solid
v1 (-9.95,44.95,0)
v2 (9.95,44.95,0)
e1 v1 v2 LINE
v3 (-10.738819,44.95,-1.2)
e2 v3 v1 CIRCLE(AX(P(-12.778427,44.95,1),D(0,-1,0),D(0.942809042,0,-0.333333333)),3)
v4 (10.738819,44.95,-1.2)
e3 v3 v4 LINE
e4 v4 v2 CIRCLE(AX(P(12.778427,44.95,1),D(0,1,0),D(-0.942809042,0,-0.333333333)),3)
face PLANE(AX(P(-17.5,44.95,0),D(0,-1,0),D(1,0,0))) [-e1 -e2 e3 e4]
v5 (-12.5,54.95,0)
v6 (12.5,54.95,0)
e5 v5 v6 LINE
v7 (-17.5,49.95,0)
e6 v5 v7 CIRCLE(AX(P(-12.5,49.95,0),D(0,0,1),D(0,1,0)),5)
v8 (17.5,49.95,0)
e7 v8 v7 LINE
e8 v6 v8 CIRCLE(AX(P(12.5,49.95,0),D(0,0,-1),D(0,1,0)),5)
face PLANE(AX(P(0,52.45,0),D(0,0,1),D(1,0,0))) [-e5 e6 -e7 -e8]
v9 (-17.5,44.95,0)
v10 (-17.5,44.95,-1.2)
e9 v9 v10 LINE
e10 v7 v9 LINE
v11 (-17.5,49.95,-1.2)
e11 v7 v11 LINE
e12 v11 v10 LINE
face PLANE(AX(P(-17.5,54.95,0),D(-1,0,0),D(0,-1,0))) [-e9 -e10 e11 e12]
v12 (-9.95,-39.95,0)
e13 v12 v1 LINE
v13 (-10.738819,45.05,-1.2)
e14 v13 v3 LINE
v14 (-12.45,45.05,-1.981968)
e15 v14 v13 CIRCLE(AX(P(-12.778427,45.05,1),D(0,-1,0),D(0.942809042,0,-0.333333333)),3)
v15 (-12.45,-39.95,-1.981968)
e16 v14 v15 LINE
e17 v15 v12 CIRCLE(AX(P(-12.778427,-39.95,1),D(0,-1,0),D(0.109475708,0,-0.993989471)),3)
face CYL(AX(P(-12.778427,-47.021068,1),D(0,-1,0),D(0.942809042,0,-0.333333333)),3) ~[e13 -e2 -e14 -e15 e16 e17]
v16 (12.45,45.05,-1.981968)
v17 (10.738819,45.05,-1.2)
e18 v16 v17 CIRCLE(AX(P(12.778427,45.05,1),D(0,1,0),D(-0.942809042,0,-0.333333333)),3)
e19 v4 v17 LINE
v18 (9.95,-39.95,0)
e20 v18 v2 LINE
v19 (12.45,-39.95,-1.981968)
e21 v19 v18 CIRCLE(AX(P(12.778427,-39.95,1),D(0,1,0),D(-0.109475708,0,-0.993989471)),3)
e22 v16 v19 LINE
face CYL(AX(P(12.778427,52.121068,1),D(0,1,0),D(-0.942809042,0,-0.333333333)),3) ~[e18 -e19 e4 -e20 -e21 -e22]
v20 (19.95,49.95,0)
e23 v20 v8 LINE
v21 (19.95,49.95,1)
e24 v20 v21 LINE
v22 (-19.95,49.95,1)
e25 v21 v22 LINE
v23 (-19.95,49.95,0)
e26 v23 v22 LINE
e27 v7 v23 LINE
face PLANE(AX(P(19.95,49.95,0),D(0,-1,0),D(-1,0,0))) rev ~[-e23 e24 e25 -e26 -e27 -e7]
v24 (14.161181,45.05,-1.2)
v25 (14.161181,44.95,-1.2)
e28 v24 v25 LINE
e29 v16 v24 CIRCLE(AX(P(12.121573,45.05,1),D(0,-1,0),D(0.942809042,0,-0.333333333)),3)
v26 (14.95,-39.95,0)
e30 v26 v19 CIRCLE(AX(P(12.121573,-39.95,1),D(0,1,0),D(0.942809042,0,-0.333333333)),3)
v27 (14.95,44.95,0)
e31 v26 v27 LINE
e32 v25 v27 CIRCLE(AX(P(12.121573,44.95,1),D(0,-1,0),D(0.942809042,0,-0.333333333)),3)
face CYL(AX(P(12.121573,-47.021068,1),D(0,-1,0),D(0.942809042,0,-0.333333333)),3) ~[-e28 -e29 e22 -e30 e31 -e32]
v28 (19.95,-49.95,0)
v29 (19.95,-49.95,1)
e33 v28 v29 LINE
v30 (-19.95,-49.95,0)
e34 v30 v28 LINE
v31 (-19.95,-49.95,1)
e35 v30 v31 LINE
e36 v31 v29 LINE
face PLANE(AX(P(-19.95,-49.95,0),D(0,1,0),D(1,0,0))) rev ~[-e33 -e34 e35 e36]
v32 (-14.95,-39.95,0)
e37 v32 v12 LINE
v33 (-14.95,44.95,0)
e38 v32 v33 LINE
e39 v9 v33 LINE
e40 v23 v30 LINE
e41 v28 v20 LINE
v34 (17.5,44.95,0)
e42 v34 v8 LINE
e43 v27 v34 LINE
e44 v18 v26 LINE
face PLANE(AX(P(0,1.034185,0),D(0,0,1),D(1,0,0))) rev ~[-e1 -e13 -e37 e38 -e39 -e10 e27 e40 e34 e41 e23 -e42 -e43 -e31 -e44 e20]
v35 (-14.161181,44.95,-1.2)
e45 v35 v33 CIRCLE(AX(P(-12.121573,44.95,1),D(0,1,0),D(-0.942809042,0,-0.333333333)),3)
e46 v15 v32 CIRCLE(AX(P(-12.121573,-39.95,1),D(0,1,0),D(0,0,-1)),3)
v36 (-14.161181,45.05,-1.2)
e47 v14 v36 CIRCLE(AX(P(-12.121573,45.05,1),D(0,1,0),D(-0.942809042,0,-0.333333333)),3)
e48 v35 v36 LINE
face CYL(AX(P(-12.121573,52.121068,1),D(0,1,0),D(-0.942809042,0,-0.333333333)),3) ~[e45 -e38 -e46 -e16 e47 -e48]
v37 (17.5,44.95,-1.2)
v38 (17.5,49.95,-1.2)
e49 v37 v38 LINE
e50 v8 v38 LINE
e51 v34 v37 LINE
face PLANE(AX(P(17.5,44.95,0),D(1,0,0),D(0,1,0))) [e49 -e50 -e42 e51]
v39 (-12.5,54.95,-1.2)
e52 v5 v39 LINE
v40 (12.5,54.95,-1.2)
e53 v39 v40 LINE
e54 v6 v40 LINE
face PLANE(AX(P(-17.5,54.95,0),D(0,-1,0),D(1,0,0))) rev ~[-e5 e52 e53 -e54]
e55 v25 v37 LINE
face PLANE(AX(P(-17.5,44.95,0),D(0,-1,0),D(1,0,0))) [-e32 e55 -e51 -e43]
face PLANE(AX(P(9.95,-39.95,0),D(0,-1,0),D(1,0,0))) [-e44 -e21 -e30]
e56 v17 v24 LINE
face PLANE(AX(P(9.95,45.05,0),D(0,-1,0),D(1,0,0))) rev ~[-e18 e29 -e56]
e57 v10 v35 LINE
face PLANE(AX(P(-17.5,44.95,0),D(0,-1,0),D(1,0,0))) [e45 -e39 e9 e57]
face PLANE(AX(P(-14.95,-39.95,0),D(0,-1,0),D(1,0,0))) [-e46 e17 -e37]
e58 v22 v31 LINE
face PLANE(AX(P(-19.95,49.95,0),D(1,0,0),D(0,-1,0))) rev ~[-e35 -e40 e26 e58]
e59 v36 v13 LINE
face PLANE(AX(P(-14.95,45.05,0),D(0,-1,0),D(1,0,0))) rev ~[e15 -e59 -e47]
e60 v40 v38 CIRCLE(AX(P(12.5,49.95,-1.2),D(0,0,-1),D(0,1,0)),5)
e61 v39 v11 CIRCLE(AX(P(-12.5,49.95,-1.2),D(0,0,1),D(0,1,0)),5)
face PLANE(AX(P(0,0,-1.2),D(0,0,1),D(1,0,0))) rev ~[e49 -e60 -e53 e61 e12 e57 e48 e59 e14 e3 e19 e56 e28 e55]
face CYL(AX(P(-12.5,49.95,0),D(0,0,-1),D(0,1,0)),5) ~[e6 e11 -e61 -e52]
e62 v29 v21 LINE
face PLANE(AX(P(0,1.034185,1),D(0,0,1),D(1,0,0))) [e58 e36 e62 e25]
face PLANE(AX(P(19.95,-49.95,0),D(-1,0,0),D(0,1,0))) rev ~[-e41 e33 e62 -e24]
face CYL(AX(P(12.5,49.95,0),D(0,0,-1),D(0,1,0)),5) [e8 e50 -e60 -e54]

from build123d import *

# Parameters (mm, degrees)
F0_W         = 35
F0_H         = 5
F1_DEPTH     = 1
F2_DEPTH     = 1.2
F3_W         = 5
F3_H         = 85
F4_DEPTH     = 2
F5_T4_DEPTH  = 99.1421356237
F5_T9_DEPTH  = 99.1421356237
F5_T14_DEPTH = 99.1421356237
F5_T19_DEPTH = 99.1421356237
F5_T24_DEPTH = 99.1421356237
F5_T29_DEPTH = 99.1421356237
F5_T34_DEPTH = 99.1421356237
F5_T39_DEPTH = 99.1421356237
F6_R         = 5


# Not quite as in the source:
# - a fillet or chamfer that OpenCascade refuses, or shapes differently, is made with other operations: its cross-section is extruded or revolved along the edge and cut away or added


with BuildPart() as f1:
    # F0 (on Top) → F1 (new body)
    with BuildSketch(Plane.XY):
        Polygon((-19.95, -49.95), (19.95, -49.95), (19.95, 49.95), (17.5, 49.95), (17.5, 44.95), (-17.5, 44.95), (-17.5, 49.95), (-19.95, 49.95), align=None)
        with Locations((0, 47.45)):
            Rectangle(F0_W, F0_H)
    extrude(amount=F1_DEPTH)

    # F0 (on Top) → F2 (join)
    with BuildSketch(Plane.XY):
        with Locations((0, 52.45)):
            Rectangle(F0_W, F0_H)
        with Locations((0, 47.45)):
            Rectangle(F0_W, F0_H)
    extrude(amount=-F2_DEPTH)

    # F3 (on face) → F4 (join)
    with BuildSketch(Plane.XY):
        with Locations((-12.45, 2.55)):
            Rectangle(F3_W, F3_H)
        with Locations((12.45, 2.55)):
            Rectangle(F3_W, F3_H)
    extrude(amount=-F4_DEPTH)

    # F5: fillet of radius 3 on 4 edges, made by hand


with BuildPart() as f5_tool2:
    # F5_s3 → F5_t4 (new body)
    with BuildSketch(Plane.XZ.offset(-52.1210678119)):
        with BuildLine():
            ThreePointArc((-14.95, 0), (-13.8536236828, -1.4494897428), (-12.1215728753, -2))
            Line((-12.1215728753, -2), (-14.95, -2))
            Line((-14.95, -2), (-14.95, 0))
        make_face()
    extrude(amount=F5_T4_DEPTH)

    split(bisect_by=Plane.XY.offset(-1.2), keep=Keep.BOTTOM)


with BuildPart() as f1_1:
    add(f1.part)

    # F5_t1: cut F5_tool2
    add(f5_tool2.part, mode=Mode.SUBTRACT)


with BuildPart() as f5_tool7:
    # F5_s8 → F5_t9 (new body)
    with BuildSketch(Plane.XZ.offset(-52.1210678119)):
        with BuildLine():
            ThreePointArc((-14.95, 0), (-13.8536236828, -1.4494897428), (-12.1215728753, -2))
            Line((-12.1215728753, -2), (-14.95, -2))
            Line((-14.95, -2), (-14.95, 0))
        make_face()
    extrude(amount=F5_T9_DEPTH)

    split(bisect_by=Plane.XZ.offset(-44.95), keep=Keep.TOP)


with BuildPart() as f1_2:
    add(f1_1.part)

    # F5_t6: cut F5_tool7
    add(f5_tool7.part, mode=Mode.SUBTRACT)


with BuildPart() as f5_tool12:
    # F5_s13 → F5_t14 (new body)
    with BuildSketch(Plane.XZ.offset(47.0210678119)):
        with BuildLine():
            ThreePointArc((-9.95, 0), (-11.0463763172, -1.4494897428), (-12.7784271247, -2))
            Line((-12.7784271247, -2), (-9.95, -2))
            Line((-9.95, -2), (-9.95, 0))
        make_face()
    extrude(amount=-F5_T14_DEPTH)

    split(bisect_by=Plane.XZ.offset(-44.95), keep=Keep.TOP)


with BuildPart() as f1_3:
    add(f1_2.part)

    # F5_t11: cut F5_tool12
    add(f5_tool12.part, mode=Mode.SUBTRACT)


with BuildPart() as f5_tool17:
    # F5_s18 → F5_t19 (new body)
    with BuildSketch(Plane.XZ.offset(47.0210678119)):
        with BuildLine():
            ThreePointArc((-9.95, 0), (-11.0463763172, -1.4494897428), (-12.7784271247, -2))
            Line((-12.7784271247, -2), (-9.95, -2))
            Line((-9.95, -2), (-9.95, 0))
        make_face()
    extrude(amount=-F5_T19_DEPTH)

    split(bisect_by=Plane.XY.offset(-1.2), keep=Keep.BOTTOM)


with BuildPart() as f1_4:
    add(f1_3.part)

    # F5_t16: cut F5_tool17
    add(f5_tool17.part, mode=Mode.SUBTRACT)


with BuildPart() as f5_tool22:
    # F5_s23 → F5_t24 (new body)
    with BuildSketch(Plane.XZ.offset(47.0210678119)):
        with BuildLine():
            ThreePointArc((14.95, 0), (13.8536236828, -1.4494897428), (12.1215728753, -2))
            Line((12.1215728753, -2), (14.95, -2))
            Line((14.95, -2), (14.95, 0))
        make_face()
    extrude(amount=-F5_T24_DEPTH)

    split(bisect_by=Plane.XZ.offset(-44.95), keep=Keep.TOP)


with BuildPart() as f1_5:
    add(f1_4.part)

    # F5_t21: cut F5_tool22
    add(f5_tool22.part, mode=Mode.SUBTRACT)


with BuildPart() as f5_tool27:
    # F5_s28 → F5_t29 (new body)
    with BuildSketch(Plane.XZ.offset(47.0210678119)):
        with BuildLine():
            ThreePointArc((14.95, 0), (13.8536236828, -1.4494897428), (12.1215728753, -2))
            Line((12.1215728753, -2), (14.95, -2))
            Line((14.95, -2), (14.95, 0))
        make_face()
    extrude(amount=-F5_T29_DEPTH)

    split(bisect_by=Plane.XY.offset(-1.2), keep=Keep.BOTTOM)


with BuildPart() as f1_6:
    add(f1_5.part)

    # F5_t26: cut F5_tool27
    add(f5_tool27.part, mode=Mode.SUBTRACT)


with BuildPart() as f5_tool32:
    # F5_s33 → F5_t34 (new body)
    with BuildSketch(Plane.XZ.offset(-52.1210678119)):
        with BuildLine():
            ThreePointArc((9.95, 0), (11.0463763172, -1.4494897428), (12.7784271247, -2))
            Line((12.7784271247, -2), (9.95, -2))
            Line((9.95, -2), (9.95, 0))
        make_face()
    extrude(amount=F5_T34_DEPTH)

    split(bisect_by=Plane.XY.offset(-1.2), keep=Keep.BOTTOM)


with BuildPart() as f1_7:
    add(f1_6.part)

    # F5_t31: cut F5_tool32
    add(f5_tool32.part, mode=Mode.SUBTRACT)


with BuildPart() as f5_tool37:
    # F5_s38 → F5_t39 (new body)
    with BuildSketch(Plane.XZ.offset(-52.1210678119)):
        with BuildLine():
            ThreePointArc((9.95, 0), (11.0463763172, -1.4494897428), (12.7784271247, -2))
            Line((12.7784271247, -2), (9.95, -2))
            Line((9.95, -2), (9.95, 0))
        make_face()
    extrude(amount=F5_T39_DEPTH)

    split(bisect_by=Plane.XZ.offset(-44.95), keep=Keep.TOP)


with BuildPart() as f1_8:
    add(f1_7.part)

    # F5_t36: cut F5_tool37
    add(f5_tool37.part, mode=Mode.SUBTRACT)

    # F6
    f6_edges = [f1_8.edges().sort_by_distance(p)[0] for p in [
        (-17.5, 54.95, -0.6),
        (17.5, 54.95, -0.6),
    ]]
    fillet(f6_edges, radius=F6_R)


solid = f1_8.part
